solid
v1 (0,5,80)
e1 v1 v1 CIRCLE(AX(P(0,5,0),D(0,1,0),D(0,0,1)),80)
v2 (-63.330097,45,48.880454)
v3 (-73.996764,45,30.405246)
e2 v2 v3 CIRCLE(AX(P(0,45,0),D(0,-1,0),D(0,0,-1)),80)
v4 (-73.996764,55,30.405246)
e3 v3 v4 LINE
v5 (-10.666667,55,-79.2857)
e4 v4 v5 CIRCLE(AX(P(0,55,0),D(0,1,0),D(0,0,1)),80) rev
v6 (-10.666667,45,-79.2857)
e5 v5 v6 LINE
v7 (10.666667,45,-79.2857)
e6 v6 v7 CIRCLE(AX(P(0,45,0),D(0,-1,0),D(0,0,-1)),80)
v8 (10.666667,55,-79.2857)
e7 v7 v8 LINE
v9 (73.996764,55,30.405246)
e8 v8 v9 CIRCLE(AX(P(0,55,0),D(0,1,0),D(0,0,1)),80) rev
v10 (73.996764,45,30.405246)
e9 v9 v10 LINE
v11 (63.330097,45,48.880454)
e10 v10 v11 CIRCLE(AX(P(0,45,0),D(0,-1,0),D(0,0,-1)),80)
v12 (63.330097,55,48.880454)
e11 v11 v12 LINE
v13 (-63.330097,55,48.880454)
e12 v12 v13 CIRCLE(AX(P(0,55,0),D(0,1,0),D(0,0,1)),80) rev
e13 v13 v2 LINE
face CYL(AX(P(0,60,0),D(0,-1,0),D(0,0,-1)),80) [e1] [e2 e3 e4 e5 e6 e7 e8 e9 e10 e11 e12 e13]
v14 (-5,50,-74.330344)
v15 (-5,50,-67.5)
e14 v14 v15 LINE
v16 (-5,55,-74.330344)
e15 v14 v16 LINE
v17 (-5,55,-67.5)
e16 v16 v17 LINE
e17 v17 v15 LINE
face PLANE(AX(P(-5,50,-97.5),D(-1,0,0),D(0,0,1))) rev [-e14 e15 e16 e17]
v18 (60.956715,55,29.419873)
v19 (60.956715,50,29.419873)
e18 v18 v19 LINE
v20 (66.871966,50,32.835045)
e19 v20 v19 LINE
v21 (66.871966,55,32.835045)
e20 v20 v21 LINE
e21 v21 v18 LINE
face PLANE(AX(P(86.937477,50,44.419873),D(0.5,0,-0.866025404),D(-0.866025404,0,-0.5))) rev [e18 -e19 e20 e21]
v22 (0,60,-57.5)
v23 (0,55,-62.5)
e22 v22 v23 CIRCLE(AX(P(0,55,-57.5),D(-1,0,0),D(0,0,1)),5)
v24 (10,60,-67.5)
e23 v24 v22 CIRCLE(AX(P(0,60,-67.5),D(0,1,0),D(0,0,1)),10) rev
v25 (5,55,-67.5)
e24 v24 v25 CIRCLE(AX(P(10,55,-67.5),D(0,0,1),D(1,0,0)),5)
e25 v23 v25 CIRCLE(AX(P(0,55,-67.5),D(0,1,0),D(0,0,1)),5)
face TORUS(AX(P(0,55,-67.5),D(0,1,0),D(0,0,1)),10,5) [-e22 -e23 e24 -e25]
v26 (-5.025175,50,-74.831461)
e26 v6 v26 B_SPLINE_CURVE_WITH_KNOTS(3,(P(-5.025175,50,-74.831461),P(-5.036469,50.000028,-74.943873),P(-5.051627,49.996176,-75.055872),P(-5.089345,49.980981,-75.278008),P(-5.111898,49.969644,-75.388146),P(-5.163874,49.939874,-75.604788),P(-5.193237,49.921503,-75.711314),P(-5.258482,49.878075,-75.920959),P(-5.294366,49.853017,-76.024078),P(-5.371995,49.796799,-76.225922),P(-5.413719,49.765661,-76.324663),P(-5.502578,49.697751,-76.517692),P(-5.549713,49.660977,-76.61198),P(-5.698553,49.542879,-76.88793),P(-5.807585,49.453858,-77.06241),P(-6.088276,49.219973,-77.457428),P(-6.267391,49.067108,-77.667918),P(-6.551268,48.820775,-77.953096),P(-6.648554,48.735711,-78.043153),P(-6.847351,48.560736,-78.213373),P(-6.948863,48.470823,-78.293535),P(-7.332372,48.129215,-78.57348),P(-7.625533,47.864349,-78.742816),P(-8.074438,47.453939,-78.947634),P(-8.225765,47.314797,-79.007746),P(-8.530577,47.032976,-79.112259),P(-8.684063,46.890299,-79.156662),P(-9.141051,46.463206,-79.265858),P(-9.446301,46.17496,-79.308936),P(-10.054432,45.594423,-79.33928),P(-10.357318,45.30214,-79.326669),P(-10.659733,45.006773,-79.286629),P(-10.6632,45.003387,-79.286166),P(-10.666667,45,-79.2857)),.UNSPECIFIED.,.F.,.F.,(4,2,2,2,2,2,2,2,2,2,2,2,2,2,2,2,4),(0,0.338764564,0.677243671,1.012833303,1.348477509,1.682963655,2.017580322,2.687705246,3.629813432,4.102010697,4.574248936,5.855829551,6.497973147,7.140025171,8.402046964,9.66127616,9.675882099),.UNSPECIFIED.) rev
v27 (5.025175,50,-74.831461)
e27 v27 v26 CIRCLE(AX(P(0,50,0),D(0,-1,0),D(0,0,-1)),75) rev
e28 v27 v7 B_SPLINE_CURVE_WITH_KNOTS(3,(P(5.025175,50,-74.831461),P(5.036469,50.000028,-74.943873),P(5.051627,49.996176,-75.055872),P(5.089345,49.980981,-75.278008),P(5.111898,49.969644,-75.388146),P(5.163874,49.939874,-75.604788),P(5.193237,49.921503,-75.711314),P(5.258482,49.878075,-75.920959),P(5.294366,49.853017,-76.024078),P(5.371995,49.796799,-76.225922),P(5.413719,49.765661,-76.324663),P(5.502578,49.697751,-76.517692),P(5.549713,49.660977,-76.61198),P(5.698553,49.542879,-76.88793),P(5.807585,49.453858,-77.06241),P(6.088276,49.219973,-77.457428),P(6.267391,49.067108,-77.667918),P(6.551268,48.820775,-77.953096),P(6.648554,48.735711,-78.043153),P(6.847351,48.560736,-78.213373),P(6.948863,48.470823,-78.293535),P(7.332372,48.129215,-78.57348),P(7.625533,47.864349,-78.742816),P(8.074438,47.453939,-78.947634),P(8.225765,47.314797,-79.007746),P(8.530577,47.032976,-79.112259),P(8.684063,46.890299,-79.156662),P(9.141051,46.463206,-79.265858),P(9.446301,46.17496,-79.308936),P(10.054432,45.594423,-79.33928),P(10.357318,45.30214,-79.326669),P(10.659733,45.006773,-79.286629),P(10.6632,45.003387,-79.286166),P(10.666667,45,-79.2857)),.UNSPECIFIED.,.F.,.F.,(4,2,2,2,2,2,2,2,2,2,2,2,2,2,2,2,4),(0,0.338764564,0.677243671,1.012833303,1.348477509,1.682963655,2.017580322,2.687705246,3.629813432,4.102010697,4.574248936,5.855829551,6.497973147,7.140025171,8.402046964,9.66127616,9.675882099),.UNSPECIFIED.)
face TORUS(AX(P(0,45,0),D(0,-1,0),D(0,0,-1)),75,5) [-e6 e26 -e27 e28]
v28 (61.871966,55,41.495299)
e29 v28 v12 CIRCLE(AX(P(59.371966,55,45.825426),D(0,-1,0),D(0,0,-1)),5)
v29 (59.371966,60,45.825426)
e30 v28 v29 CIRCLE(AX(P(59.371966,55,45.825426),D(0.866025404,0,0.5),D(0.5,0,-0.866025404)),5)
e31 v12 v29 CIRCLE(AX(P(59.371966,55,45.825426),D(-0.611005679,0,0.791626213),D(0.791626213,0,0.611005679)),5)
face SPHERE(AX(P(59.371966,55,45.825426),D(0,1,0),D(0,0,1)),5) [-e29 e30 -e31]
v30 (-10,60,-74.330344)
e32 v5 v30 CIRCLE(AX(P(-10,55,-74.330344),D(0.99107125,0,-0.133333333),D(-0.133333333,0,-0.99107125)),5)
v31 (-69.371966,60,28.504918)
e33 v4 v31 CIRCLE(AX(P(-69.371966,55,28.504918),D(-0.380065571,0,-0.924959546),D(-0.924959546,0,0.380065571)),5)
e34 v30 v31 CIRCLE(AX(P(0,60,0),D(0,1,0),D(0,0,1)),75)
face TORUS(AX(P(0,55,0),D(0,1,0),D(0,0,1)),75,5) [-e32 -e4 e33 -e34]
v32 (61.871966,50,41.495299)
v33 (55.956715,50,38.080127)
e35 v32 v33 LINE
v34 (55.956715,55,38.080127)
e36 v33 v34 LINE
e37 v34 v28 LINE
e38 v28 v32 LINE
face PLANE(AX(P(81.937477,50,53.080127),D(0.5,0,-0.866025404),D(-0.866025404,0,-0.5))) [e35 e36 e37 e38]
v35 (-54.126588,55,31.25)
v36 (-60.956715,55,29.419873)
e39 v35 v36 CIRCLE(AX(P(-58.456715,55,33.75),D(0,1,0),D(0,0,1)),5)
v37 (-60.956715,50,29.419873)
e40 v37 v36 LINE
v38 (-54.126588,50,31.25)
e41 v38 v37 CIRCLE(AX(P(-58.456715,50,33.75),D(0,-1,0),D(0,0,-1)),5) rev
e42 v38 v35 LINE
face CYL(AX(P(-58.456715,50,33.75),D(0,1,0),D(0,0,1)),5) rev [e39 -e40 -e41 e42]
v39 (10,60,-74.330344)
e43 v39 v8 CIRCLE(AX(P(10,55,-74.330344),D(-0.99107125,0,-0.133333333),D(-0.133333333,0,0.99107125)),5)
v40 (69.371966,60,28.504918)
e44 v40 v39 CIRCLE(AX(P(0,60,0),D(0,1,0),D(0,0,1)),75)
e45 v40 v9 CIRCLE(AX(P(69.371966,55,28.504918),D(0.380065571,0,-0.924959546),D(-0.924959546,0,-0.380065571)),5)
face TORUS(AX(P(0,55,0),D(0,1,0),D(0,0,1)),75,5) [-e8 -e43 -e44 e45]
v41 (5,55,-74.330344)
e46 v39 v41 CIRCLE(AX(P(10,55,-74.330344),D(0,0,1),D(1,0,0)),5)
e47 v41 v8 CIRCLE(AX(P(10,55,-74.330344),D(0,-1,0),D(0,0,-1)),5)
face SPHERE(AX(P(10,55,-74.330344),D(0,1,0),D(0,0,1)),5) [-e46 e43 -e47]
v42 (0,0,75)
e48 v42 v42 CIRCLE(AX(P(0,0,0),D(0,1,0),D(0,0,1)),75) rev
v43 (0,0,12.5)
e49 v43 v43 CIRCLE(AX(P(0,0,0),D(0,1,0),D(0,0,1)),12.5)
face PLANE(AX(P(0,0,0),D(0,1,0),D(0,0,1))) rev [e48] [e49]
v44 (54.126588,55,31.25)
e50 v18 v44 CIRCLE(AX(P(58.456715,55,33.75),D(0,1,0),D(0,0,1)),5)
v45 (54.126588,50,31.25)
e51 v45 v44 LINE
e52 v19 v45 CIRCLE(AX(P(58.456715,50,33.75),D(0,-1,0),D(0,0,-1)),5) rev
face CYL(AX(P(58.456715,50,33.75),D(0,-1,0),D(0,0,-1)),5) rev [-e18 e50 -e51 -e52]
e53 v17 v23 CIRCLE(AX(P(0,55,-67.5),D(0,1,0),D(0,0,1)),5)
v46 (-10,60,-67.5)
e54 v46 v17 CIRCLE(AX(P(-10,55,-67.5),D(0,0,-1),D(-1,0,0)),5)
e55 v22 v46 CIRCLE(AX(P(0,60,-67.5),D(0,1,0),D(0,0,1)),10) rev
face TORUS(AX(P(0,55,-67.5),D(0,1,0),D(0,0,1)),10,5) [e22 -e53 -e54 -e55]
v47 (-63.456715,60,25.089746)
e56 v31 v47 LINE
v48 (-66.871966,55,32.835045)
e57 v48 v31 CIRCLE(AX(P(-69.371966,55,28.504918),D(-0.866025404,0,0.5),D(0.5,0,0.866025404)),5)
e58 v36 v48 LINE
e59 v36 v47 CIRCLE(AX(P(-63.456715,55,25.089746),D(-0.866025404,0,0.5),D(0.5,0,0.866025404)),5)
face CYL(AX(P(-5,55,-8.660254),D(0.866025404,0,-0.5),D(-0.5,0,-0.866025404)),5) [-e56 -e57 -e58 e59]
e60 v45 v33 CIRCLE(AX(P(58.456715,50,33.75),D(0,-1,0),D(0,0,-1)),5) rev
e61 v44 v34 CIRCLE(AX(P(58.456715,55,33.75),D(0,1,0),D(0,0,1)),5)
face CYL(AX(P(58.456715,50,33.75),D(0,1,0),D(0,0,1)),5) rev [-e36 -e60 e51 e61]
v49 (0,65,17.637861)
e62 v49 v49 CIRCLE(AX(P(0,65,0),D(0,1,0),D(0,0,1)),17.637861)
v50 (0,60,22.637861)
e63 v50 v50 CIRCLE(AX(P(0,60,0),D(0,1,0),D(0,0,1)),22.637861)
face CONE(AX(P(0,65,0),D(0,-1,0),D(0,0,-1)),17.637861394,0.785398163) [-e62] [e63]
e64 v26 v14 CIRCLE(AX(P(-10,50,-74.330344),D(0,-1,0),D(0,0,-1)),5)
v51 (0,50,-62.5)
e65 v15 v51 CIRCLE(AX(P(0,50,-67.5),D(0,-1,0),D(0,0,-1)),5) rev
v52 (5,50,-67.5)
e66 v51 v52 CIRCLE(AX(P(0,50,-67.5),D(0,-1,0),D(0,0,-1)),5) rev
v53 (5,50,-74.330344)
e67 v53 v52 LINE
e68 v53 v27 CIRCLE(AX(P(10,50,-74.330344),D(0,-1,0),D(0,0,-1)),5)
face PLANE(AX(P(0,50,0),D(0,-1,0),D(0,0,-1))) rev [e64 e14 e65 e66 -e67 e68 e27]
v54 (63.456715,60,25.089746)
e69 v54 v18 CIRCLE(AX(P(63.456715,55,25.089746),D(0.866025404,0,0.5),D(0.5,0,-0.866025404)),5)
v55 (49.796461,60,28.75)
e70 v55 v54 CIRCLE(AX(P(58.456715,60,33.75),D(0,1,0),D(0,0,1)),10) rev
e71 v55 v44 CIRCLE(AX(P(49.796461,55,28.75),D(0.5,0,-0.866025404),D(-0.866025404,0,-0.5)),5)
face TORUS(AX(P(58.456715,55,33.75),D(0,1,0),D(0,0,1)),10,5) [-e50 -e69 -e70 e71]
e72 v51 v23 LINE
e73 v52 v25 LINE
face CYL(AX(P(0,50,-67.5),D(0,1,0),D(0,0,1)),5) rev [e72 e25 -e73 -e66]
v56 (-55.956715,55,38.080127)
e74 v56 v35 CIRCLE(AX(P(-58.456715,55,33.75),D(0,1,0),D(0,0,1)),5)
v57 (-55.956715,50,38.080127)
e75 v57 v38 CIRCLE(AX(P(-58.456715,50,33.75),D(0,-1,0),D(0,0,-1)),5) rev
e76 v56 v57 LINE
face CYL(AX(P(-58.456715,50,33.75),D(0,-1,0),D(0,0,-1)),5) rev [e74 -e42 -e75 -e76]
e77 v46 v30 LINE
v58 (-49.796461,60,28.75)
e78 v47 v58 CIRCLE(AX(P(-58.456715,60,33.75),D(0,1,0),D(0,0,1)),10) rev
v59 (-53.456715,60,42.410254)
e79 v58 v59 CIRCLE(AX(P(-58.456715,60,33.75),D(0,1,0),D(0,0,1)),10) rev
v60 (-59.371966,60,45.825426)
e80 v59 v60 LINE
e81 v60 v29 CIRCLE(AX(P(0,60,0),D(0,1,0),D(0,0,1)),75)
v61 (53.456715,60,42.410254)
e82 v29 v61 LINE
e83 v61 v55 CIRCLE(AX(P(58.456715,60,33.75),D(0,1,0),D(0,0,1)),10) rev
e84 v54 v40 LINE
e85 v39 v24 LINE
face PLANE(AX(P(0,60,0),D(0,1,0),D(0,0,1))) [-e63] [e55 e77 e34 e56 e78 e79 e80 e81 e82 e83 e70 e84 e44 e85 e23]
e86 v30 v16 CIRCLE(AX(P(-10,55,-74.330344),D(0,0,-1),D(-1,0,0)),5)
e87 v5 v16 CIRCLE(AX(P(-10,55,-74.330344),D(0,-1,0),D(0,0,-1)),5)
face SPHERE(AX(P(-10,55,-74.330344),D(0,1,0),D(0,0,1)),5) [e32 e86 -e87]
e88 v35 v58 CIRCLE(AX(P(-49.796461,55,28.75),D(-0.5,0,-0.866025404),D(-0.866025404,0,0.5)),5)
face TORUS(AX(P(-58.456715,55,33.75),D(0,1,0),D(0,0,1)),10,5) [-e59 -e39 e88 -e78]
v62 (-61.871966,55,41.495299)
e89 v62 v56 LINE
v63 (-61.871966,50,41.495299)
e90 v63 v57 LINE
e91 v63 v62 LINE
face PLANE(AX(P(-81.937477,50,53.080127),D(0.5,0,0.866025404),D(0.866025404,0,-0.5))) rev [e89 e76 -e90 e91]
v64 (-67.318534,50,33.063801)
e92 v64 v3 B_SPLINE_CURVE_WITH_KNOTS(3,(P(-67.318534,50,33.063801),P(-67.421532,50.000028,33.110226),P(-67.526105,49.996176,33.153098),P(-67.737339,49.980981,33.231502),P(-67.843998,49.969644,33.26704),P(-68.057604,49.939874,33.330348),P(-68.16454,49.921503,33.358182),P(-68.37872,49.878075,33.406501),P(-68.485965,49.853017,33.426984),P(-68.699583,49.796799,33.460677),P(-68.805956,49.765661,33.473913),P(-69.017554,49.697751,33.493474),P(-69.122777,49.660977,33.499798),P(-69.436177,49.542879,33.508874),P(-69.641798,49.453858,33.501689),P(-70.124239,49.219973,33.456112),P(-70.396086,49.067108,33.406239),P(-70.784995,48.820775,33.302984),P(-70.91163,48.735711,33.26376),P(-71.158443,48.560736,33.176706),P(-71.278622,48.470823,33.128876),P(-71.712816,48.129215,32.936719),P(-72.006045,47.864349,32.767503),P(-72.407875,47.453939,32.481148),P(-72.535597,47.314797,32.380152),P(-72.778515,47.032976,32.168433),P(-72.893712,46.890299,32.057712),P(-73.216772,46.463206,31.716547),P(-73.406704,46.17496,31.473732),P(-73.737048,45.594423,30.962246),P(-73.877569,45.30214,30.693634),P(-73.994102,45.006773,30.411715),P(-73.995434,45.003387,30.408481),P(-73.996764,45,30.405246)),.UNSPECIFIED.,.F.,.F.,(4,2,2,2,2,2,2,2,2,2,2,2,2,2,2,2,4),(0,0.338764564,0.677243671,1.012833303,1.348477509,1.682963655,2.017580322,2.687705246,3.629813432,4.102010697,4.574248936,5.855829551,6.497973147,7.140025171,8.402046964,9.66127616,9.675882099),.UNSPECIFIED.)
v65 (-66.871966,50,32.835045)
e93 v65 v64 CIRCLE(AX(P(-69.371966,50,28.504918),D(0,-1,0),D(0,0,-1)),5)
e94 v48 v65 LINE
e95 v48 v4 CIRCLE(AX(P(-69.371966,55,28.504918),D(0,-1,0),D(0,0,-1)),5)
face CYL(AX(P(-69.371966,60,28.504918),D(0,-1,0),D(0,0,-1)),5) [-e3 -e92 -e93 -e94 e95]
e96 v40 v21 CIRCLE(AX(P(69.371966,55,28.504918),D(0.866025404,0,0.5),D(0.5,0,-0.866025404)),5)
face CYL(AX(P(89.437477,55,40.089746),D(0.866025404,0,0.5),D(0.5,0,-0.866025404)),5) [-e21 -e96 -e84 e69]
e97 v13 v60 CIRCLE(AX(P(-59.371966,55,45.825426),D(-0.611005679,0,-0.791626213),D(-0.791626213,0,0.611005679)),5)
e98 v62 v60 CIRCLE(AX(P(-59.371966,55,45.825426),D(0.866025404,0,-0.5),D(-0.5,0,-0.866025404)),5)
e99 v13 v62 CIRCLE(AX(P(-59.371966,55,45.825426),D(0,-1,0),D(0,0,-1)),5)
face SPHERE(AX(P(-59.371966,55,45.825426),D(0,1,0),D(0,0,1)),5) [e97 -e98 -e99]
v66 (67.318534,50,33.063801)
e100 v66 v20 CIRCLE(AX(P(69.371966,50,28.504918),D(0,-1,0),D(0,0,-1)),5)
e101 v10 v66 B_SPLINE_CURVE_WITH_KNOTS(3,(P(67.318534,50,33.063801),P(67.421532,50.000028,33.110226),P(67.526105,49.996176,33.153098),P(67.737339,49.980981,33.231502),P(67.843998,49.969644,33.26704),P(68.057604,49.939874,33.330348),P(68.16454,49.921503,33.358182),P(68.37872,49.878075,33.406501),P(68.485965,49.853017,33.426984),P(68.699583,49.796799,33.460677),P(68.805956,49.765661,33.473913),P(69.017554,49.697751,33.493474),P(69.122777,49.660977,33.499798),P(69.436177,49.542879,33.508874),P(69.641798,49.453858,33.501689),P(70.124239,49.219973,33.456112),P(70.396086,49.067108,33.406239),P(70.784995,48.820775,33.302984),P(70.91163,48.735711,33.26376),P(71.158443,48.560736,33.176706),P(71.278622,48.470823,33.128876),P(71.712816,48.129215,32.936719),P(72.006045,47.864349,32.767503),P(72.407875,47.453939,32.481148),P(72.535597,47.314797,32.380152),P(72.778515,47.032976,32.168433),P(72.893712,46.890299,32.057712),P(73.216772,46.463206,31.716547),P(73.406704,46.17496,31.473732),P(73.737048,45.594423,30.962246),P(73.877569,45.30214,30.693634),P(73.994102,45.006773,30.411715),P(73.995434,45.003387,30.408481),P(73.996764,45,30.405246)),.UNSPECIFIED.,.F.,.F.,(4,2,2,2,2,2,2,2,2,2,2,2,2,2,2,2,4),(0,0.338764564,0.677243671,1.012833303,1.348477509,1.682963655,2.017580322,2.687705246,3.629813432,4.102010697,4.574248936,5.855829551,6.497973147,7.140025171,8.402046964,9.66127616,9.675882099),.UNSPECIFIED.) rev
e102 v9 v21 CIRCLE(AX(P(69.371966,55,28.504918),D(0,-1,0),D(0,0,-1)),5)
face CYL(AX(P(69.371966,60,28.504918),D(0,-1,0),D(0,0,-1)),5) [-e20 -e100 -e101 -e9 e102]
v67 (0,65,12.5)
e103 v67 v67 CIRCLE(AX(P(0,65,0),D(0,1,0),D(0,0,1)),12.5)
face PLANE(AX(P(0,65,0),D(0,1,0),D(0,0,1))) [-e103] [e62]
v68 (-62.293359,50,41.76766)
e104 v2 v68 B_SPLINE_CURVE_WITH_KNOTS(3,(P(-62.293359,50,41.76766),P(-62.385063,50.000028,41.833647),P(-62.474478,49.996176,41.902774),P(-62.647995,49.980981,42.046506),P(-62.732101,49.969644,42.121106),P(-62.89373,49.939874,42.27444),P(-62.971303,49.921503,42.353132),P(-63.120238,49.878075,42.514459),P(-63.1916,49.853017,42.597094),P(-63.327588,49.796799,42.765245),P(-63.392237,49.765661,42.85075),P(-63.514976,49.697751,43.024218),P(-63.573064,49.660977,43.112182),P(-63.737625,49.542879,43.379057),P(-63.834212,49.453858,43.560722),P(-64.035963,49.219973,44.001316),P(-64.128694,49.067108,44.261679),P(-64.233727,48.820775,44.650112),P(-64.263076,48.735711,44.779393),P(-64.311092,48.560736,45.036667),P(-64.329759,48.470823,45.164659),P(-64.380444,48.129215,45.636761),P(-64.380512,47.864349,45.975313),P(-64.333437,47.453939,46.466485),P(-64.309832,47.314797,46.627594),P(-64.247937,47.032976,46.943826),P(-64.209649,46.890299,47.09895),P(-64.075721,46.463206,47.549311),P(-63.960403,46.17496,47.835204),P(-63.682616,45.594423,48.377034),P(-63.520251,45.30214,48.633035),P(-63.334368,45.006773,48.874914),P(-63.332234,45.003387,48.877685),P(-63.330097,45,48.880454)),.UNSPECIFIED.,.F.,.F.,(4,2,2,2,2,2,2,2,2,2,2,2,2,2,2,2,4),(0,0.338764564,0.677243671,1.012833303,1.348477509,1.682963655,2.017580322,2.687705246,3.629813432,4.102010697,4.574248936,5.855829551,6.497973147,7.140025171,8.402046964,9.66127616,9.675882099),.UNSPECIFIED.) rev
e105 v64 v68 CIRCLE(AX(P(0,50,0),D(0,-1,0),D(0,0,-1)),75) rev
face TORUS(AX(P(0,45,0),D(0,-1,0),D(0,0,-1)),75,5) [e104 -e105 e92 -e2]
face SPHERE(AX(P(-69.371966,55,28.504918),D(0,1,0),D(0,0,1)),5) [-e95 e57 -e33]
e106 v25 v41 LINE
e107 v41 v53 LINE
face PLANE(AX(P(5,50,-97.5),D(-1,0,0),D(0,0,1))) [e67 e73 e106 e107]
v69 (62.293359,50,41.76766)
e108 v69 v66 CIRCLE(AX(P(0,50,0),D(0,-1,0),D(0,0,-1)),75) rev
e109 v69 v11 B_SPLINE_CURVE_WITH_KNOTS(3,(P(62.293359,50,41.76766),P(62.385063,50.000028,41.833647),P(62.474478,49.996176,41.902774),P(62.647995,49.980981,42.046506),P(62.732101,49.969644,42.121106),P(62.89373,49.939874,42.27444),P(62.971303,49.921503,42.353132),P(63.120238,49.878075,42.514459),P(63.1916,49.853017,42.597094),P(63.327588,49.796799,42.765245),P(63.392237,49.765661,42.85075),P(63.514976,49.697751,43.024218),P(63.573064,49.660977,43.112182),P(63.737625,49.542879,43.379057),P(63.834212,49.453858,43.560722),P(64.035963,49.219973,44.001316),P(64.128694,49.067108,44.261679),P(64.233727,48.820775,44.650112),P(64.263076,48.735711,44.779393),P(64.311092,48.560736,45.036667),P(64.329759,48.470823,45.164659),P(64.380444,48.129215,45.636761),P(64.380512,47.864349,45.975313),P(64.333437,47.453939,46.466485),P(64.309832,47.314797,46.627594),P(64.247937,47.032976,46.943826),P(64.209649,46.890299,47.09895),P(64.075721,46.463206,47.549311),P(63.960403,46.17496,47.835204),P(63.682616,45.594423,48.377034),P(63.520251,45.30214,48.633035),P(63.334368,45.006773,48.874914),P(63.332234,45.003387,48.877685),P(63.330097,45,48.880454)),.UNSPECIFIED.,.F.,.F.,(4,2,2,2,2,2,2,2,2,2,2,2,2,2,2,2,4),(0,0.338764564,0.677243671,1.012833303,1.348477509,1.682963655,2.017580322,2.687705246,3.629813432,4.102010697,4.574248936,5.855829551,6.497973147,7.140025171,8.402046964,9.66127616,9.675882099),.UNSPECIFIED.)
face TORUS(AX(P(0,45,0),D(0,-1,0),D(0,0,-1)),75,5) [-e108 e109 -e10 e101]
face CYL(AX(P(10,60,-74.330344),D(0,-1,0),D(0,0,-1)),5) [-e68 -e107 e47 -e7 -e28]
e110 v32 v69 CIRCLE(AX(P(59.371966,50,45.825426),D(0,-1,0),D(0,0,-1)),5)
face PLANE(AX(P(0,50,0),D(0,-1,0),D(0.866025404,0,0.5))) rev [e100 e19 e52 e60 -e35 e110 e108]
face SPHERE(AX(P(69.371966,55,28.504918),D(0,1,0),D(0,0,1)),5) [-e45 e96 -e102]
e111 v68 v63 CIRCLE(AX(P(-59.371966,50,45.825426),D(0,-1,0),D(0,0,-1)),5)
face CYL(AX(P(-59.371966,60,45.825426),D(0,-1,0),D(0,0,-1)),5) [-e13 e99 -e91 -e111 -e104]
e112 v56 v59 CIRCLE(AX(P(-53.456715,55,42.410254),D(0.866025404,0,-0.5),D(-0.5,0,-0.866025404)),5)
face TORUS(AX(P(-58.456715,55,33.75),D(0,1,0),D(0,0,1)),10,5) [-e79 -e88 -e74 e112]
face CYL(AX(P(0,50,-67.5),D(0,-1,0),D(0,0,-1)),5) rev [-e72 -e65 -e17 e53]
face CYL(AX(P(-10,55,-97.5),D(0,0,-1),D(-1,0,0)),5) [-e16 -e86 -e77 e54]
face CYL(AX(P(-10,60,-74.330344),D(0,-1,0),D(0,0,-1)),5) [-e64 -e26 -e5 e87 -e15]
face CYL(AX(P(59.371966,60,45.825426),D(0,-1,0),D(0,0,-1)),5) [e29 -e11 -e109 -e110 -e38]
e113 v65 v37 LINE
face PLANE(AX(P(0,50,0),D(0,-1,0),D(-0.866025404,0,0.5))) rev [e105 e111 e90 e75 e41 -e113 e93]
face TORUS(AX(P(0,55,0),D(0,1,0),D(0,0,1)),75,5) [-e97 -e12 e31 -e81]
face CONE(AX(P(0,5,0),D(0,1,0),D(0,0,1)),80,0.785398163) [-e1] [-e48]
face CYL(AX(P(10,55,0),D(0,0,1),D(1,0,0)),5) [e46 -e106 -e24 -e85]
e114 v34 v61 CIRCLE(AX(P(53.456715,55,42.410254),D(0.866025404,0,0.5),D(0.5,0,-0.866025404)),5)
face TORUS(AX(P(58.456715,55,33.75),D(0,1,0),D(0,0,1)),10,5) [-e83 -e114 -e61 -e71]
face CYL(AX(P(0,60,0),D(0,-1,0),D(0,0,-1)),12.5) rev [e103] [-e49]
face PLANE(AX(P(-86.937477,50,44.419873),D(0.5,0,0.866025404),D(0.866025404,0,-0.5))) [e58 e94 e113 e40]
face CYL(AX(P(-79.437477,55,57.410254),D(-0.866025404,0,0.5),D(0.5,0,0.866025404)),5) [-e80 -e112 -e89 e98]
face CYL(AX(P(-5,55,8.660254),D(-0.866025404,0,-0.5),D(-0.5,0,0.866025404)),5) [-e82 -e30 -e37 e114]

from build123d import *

# Parameters (mm, degrees)
SKETCH_1_R                       = 80
SKETCH_1_R_2                     = 12.5
EXTRUDE_1_DEPTH                  = 60
SKETCH_2_R                       = 22.637861394
SKETCH_2_R_2                     = 12.5
EXTRUDE_2_DEPTH                  = 5
CHAMFER_1_SIZE                   = 5
CHAMFER_2_SIZE                   = 5
SKETCH_3_W                       = 10
SKETCH_3_H                       = 35
CUT_EXTRUDE_1_DEPTH              = 10
FILLET_1_R                       = 5
PATTERN_CIRCULAR_1_COUNT         = 3
FILLET_1_OF_PATTERN_CIRCULAR_1_R = 5
FILLET_2_R                       = 5


# Some blends are built 0.0001 mm under size
with BuildPart() as part:
    # 草图1 → 凸台-拉伸1 (new body)
    with BuildSketch(Plane(origin=(0, 0, 0), x_dir=(1, 0, 0), z_dir=(0, 1, 0))):
        with Locations(Location((0, 0, 0), (0, 0, 270))):
            Circle(SKETCH_1_R)
        with Locations(Location((0, 0, 0), (0, 0, 270))):
            Circle(SKETCH_1_R_2, mode=Mode.SUBTRACT)
    extrude(amount=EXTRUDE_1_DEPTH)

    # 草图2 → 凸台-拉伸2 (add)
    with BuildSketch(Plane(origin=(0, 60, 0), x_dir=(1, 0, 0), z_dir=(0, 1, 0))):
        with Locations(Location((0, 0, 0), (0, 0, 270))):
            Circle(SKETCH_2_R)
        with Locations(Location((0, 0, 0), (0, 0, 270))):
            Circle(SKETCH_2_R_2, mode=Mode.SUBTRACT)
    extrude(amount=EXTRUDE_2_DEPTH)

    # 倒角1
    chamfer_1_edges = [part.edges().sort_by_distance(p)[0] for p in [
        (0, 65, -22.637861394),
    ]]
    chamfer(chamfer_1_edges, length=CHAMFER_1_SIZE - 0.0001)  # a hair under: the kernel refuses the full size

    # 倒角2
    chamfer_2_edges = [part.edges().sort_by_distance(p)[0] for p in [
        (0, 0, -80),
    ]]
    chamfer(chamfer_2_edges, length=CHAMFER_2_SIZE)

    # 草图3 → 切除-拉伸1 (cut)
    with BuildSketch(Plane(origin=(0, 60, 0), x_dir=(1, 0, 0), z_dir=(0, 1, 0))):
        with Locations((0, 80)):
            Rectangle(SKETCH_3_W, SKETCH_3_H)
    cut_extrude_1 = extrude(amount=-CUT_EXTRUDE_1_DEPTH, mode=Mode.SUBTRACT)

    # 圆角1
    # the kernel refuses this fillet: 5 mm, written as the material it adds along each edge
    with BuildSketch(Plane(origin=(5, 60, -62.5), x_dir=(0, 0, -1), z_dir=(0, -1, 0))) as fillet_1_piece_1:
        with BuildLine():
            CenterArc((FILLET_1_R, -FILLET_1_R), FILLET_1_R, 90, 90)
            Line((0, -FILLET_1_R), (0, 0))
            Line((0, 0), (FILLET_1_R, 0))
        make_face()
    extrude(amount=22.5)
    with BuildSketch(Plane(origin=(-5, 60, -62.5), x_dir=(0, 0, -1), z_dir=(0, -1, 0))) as fillet_1_piece_2:
        with BuildLine():
            CenterArc((FILLET_1_R, FILLET_1_R), FILLET_1_R, 180, 90)
            Line((0, FILLET_1_R), (0, 0))
            Line((0, 0), (FILLET_1_R, 0))
        make_face()
    extrude(amount=22.5)
    # the kernel refuses this fillet: 5 mm, written as the material it takes off along each edge
    with BuildSketch(Plane(origin=(0, 50, 0), x_dir=(-0.21704975973433055, 0, -0.9761605409968533), z_dir=(-0.9761605409968533, 0, 0.21704975973433055))) as fillet_1_2_piece_1_section:
        with BuildLine():
            CenterArc((80 - FILLET_1_R, FILLET_1_R), FILLET_1_R, 270, 90)
            Line((80 - FILLET_1_R, 0), (80, 0))
            Line((80, 0), (80, FILLET_1_R))
        make_face()
    fillet_1_2_piece_1 = revolve(axis=Axis((0, 50, 0), (0, -1, 0)), revolution_arc=25.071620089, mode=Mode.PRIVATE)
    fillet_1_2_piece_1 = split(fillet_1_2_piece_1, bisect_by=Plane(origin=(5, 48.868036462, -78.815102538), z_dir=(-1, 0, 0)), keep=Keep.TOP, mode=Mode.PRIVATE)
    fillet_1_2_piece_1 = split(fillet_1_2_piece_1, bisect_by=Plane(origin=(-5, 48.868036462, -78.815102538), z_dir=(1, 0, 0)), keep=Keep.TOP, mode=Mode.PRIVATE)
    add(fillet_1_2_piece_1, mode=Mode.SUBTRACT)
    with BuildSketch(Plane(origin=(5, 74.235159008, -79.843597113), x_dir=(0.995188508885034, 0, 0.09797873127971658), z_dir=(0, -1, 0))) as fillet_1_2_piece_2:
        with BuildLine():
            CenterArc((5.516124116, 4.996832751), FILLET_1_R, 174.37721132, 97.662255661)
            Line((0.540181571, 5.486726407), (0, 0))
            ThreePointArc((0, 0), (2.847031802, -0.050675988), (5.694063603, 0))
        make_face()
    extrude(amount=24.235159008, mode=Mode.SUBTRACT)
    with BuildSketch(Plane(origin=(-5, 74.235159008, -79.843597113), x_dir=(-0.9951885088850337, 0, 0.09797873127971717), z_dir=(0, -1, 0))) as fillet_1_2_piece_3:
        with BuildLine():
            CenterArc((5.516124116, -4.996832751), FILLET_1_R, 87.960533019, 97.662255661)
            Line((0.540181571, -5.486726407), (0, 0))
            ThreePointArc((0, 0), (2.847031802, 0.050675988), (5.694063603, 0))
        make_face()
    extrude(amount=24.235159008, mode=Mode.SUBTRACT)
    with BuildSketch(Plane(origin=(-5, 74.235159008, -79.843597113), x_dir=(-0.9951885088850337, 0, 0.09797873127971717), z_dir=(0, -1, 0))) as fillet_1_2_piece_4a_section:
        with BuildLine():
            CenterArc((5.516124116, -4.996832751), FILLET_1_R, 87.960533019, 97.662255661)
            Line((0.540181571, -5.486726407), (0, 0))
            ThreePointArc((0, 0), (2.847031802, 0.050675988), (5.694063603, 0))
        make_face()
    fillet_1_2_piece_4a = extrude(amount=38.470318016, mode=Mode.PRIVATE)
    fillet_1_2_piece_4a = split(fillet_1_2_piece_4a, bisect_by=Plane(origin=(-6.303094147, 50, -78.486698353), z_dir=(0, -1, 0)), keep=Keep.TOP, mode=Mode.PRIVATE)
    with BuildSketch(Plane(origin=(0, 50, 0), x_dir=(-0.21704975973433055, 0, -0.9761605409968533), z_dir=(-0.9761605409968533, 0, 0.21704975973433055))) as fillet_1_2_piece_4b_section:
        with BuildLine():
            CenterArc((80 - FILLET_1_R, FILLET_1_R), FILLET_1_R, 270, 90)
            Line((80 - FILLET_1_R, 0), (80, 0))
            Line((80, 0), (80, FILLET_1_R))
        make_face()
    fillet_1_2_piece_4b = revolve(axis=Axis((0, 50, 0), (0, -1, 0)), revolution_arc=25.071620089, mode=Mode.PRIVATE)
    fillet_1_2_piece_4b = split(fillet_1_2_piece_4b, bisect_by=Plane(origin=(-5, 48.855762225, -78.026154308), z_dir=(-1, 0, 0)), keep=Keep.TOP, mode=Mode.PRIVATE)
    fillet_1_2_piece_4 = fillet_1_2_piece_4a & fillet_1_2_piece_4b
    add(fillet_1_2_piece_4, mode=Mode.SUBTRACT)
    with BuildSketch(Plane(origin=(0, 50, 0), x_dir=(-0.21704975973433055, 0, -0.9761605409968533), z_dir=(-0.9761605409968533, 0, 0.21704975973433055))) as fillet_1_2_piece_5a_section:
        with BuildLine():
            CenterArc((80 - FILLET_1_R, FILLET_1_R), FILLET_1_R, 270, 90)
            Line((80 - FILLET_1_R, 0), (80, 0))
            Line((80, 0), (80, FILLET_1_R))
        make_face()
    fillet_1_2_piece_5a = revolve(axis=Axis((0, 50, 0), (0, -1, 0)), revolution_arc=25.071620089, mode=Mode.PRIVATE)
    fillet_1_2_piece_5a = split(fillet_1_2_piece_5a, bisect_by=Plane(origin=(5, 48.855762126, -78.026154496), z_dir=(1, 0, 0)), keep=Keep.TOP, mode=Mode.PRIVATE)
    with BuildSketch(Plane(origin=(5, 74.235159008, -79.843597113), x_dir=(0.995188508885034, 0, 0.09797873127971658), z_dir=(0, -1, 0))) as fillet_1_2_piece_5b_section:
        with BuildLine():
            CenterArc((5.516124116, 4.996832751), FILLET_1_R, 174.37721132, 97.662255661)
            Line((0.540181571, 5.486726407), (0, 0))
            ThreePointArc((0, 0), (2.847031802, -0.050675988), (5.694063603, 0))
        make_face()
    fillet_1_2_piece_5b = extrude(amount=38.470318016, mode=Mode.PRIVATE)
    fillet_1_2_piece_5b = split(fillet_1_2_piece_5b, bisect_by=Plane(origin=(6.303094147, 50, -78.486698353), z_dir=(0, -1, 0)), keep=Keep.TOP, mode=Mode.PRIVATE)
    fillet_1_2_piece_5 = fillet_1_2_piece_5a & fillet_1_2_piece_5b
    add(fillet_1_2_piece_5, mode=Mode.SUBTRACT)

    # 阵列(圆周)1: 切除-拉伸1 ×3 about axis
    pattern_circular_1_axis = Axis((0, 0, 0), (0, 1, 0))
    for i in range(1, PATTERN_CIRCULAR_1_COUNT):
        add(cut_extrude_1.rotate(pattern_circular_1_axis, i * 360 / PATTERN_CIRCULAR_1_COUNT), mode=Mode.SUBTRACT)

    # 圆角1 of 阵列(圆周)1
    # the kernel refuses this fillet: 5 mm, written as the material it adds along each edge
    with BuildSketch(Plane(origin=(-56.626587737, 60, 26.919872981), x_dir=(0.4999999999999999, 0, 0.8660254037844387), z_dir=(0, -1, 0)), Plane(origin=(-51.626587737, 60, 35.580127019), x_dir=(-0.8660254037844385, 0, 0.5000000000000002), z_dir=(0, -1, 0)), Plane(origin=(51.626587737, 60, 35.580127019), x_dir=(0.5000000000000002, 0, -0.8660254037844385), z_dir=(0, -1, 0)), Plane(origin=(56.626587737, 60, 26.919872981), x_dir=(0.8660254037844382, 0, 0.5000000000000007), z_dir=(0, -1, 0))) as fillet_1_of_pattern_circular_1_piece_1:
        with BuildLine():
            CenterArc((FILLET_1_OF_PATTERN_CIRCULAR_1_R, FILLET_1_OF_PATTERN_CIRCULAR_1_R), FILLET_1_OF_PATTERN_CIRCULAR_1_R, 180, 90)
            Line((0, FILLET_1_OF_PATTERN_CIRCULAR_1_R), (0, 0))
            Line((0, 0), (FILLET_1_OF_PATTERN_CIRCULAR_1_R, 0))
        make_face()
    extrude(amount=22.5)
    # the kernel refuses this fillet: 5 mm, written as the material it takes off along each edge
    with BuildSketch(Plane(origin=(0, 50, 0), x_dir=(-0.7368549468080707, 0, 0.6760508763136656), z_dir=(0.6760508763136656, 0, 0.7368549468080707))) as fillet_1_of_pattern_circular_1_2_piece_1_section:
        with BuildLine():
            CenterArc((80 - FILLET_1_OF_PATTERN_CIRCULAR_1_R, FILLET_1_OF_PATTERN_CIRCULAR_1_R), FILLET_1_OF_PATTERN_CIRCULAR_1_R, 270, 90)
            Line((80 - FILLET_1_OF_PATTERN_CIRCULAR_1_R, 0), (80, 0))
            Line((80, 0), (80, FILLET_1_OF_PATTERN_CIRCULAR_1_R))
        make_face()
    fillet_1_of_pattern_circular_1_2_piece_1 = revolve(axis=Axis((0, 50, 0), (0, -1, 0)), revolution_arc=25.071620089, mode=Mode.PRIVATE)
    fillet_1_of_pattern_circular_1_2_piece_1 = split(fillet_1_of_pattern_circular_1_2_piece_1, bisect_by=Plane(origin=(-70.755881, 48.868036462, 35.07742425), z_dir=(0.49999999999999994, 0, 0.8660254037844389)), keep=Keep.TOP, mode=Mode.PRIVATE)
    fillet_1_of_pattern_circular_1_2_piece_1 = split(fillet_1_of_pattern_circular_1_2_piece_1, bisect_by=Plane(origin=(-65.755881, 48.868036462, 43.737678288), z_dir=(-0.49999999999999994, 0, -0.8660254037844387)), keep=Keep.TOP, mode=Mode.PRIVATE)
    add(fillet_1_of_pattern_circular_1_2_piece_1, mode=Mode.SUBTRACT)
    with BuildSketch(Plane(origin=(-71.64658343, 74.235159008, 35.591671538), x_dir=(-0.4127421841237098, 0, -0.9108478958886547), z_dir=(0, -1, 0)), Plane(origin=(66.64658343, 74.235159008, 44.251925576), x_dir=(-0.5824463247613232, 0, 0.8128691646089347), z_dir=(0, -1, 0))) as fillet_1_of_pattern_circular_1_2_piece_2:
        with BuildLine():
            CenterArc((5.516124116, 4.996832751), FILLET_1_OF_PATTERN_CIRCULAR_1_R, 174.37721132, 97.662255661)
            Line((0.540181571, 5.486726407), (0, 0))
            ThreePointArc((0, 0), (2.847031802, -0.050675988), (5.694063603, 0))
        make_face()
    extrude(amount=24.235159008, mode=Mode.SUBTRACT)
    with BuildSketch(Plane(origin=(-66.64658343, 74.235159008, 44.251925576), x_dir=(0.582446324761323, 0, 0.8128691646089348), z_dir=(0, -1, 0)), Plane(origin=(71.64658343, 74.235159008, 35.591671538), x_dir=(0.41274218412371083, 0, -0.9108478958886541), z_dir=(0, -1, 0))) as fillet_1_of_pattern_circular_1_2_piece_3:
        with BuildLine():
            CenterArc((5.516124116, -4.996832751), FILLET_1_OF_PATTERN_CIRCULAR_1_R, 87.960533019, 97.662255661)
            Line((0.540181571, -5.486726407), (0, 0))
            ThreePointArc((0, 0), (2.847031802, 0.050675988), (5.694063603, 0))
        make_face()
    extrude(amount=24.235159008, mode=Mode.SUBTRACT)
    with BuildSketch(Plane(origin=(0, 50, 0), x_dir=(0.9539047065424011, 0, 0.3001096646831883), z_dir=(0.3001096646831883, 0, -0.9539047065424011))) as fillet_1_of_pattern_circular_1_2_piece_4_section:
        with BuildLine():
            CenterArc((80 - FILLET_1_OF_PATTERN_CIRCULAR_1_R, FILLET_1_OF_PATTERN_CIRCULAR_1_R), FILLET_1_OF_PATTERN_CIRCULAR_1_R, 270, 90)
            Line((80 - FILLET_1_OF_PATTERN_CIRCULAR_1_R, 0), (80, 0))
            Line((80, 0), (80, FILLET_1_OF_PATTERN_CIRCULAR_1_R))
        make_face()
    fillet_1_of_pattern_circular_1_2_piece_4 = revolve(axis=Axis((0, 50, 0), (0, -1, 0)), revolution_arc=25.071620089, mode=Mode.PRIVATE)
    fillet_1_of_pattern_circular_1_2_piece_4 = split(fillet_1_of_pattern_circular_1_2_piece_4, bisect_by=Plane(origin=(65.755881, 48.868036462, 43.737678288), z_dir=(0.5000000000000004, 0, -0.8660254037844385)), keep=Keep.TOP, mode=Mode.PRIVATE)
    fillet_1_of_pattern_circular_1_2_piece_4 = split(fillet_1_of_pattern_circular_1_2_piece_4, bisect_by=Plane(origin=(70.755881, 48.868036462, 35.07742425), z_dir=(-0.5000000000000003, 0, 0.8660254037844385)), keep=Keep.TOP, mode=Mode.PRIVATE)
    add(fillet_1_of_pattern_circular_1_2_piece_4, mode=Mode.SUBTRACT)
    with BuildSketch(Plane(origin=(-66.64658343, 74.235159008, 44.251925576), x_dir=(0.582446324761323, 0, 0.8128691646089348), z_dir=(0, -1, 0))) as fillet_1_of_pattern_circular_1_2_piece_5a_section:
        with BuildLine():
            CenterArc((5.516124116, -4.996832751), FILLET_1_OF_PATTERN_CIRCULAR_1_R, 87.960533019, 97.662255661)
            Line((0.540181571, -5.486726407), (0, 0))
            ThreePointArc((0, 0), (2.847031802, 0.050675988), (5.694063603, 0))
        make_face()
    fillet_1_of_pattern_circular_1_2_piece_5a = extrude(amount=38.470318016, mode=Mode.PRIVATE)
    fillet_1_of_pattern_circular_1_2_piece_5a = split(fillet_1_of_pattern_circular_1_2_piece_5a, bisect_by=Plane(origin=(-64.81992756, 50, 44.70198883), z_dir=(0, -1, 0)), keep=Keep.TOP, mode=Mode.PRIVATE)
    with BuildSketch(Plane(origin=(0, 50, 0), x_dir=(-0.7368549468080707, 0, 0.6760508763136656), z_dir=(0.6760508763136656, 0, 0.7368549468080707))) as fillet_1_of_pattern_circular_1_2_piece_5b_section:
        with BuildLine():
            CenterArc((80 - FILLET_1_OF_PATTERN_CIRCULAR_1_R, FILLET_1_OF_PATTERN_CIRCULAR_1_R), FILLET_1_OF_PATTERN_CIRCULAR_1_R, 270, 90)
            Line((80 - FILLET_1_OF_PATTERN_CIRCULAR_1_R, 0), (80, 0))
            Line((80, 0), (80, FILLET_1_OF_PATTERN_CIRCULAR_1_R))
        make_face()
    fillet_1_of_pattern_circular_1_2_piece_5b = revolve(axis=Axis((0, 50, 0), (0, -1, 0)), revolution_arc=25.071620089, mode=Mode.PRIVATE)
    fillet_1_of_pattern_circular_1_2_piece_5b = split(fillet_1_of_pattern_circular_1_2_piece_5b, bisect_by=Plane(origin=(-65.072631791, 48.855762225, 43.343204173), z_dir=(0.49999999999999994, 0, 0.8660254037844387)), keep=Keep.TOP, mode=Mode.PRIVATE)
    fillet_1_of_pattern_circular_1_2_piece_5 = fillet_1_of_pattern_circular_1_2_piece_5a & fillet_1_of_pattern_circular_1_2_piece_5b
    add(fillet_1_of_pattern_circular_1_2_piece_5, mode=Mode.SUBTRACT)
    with BuildSketch(Plane(origin=(0, 50, 0), x_dir=(-0.7368549468080707, 0, 0.6760508763136656), z_dir=(0.6760508763136656, 0, 0.7368549468080707))) as fillet_1_of_pattern_circular_1_2_piece_6a_section:
        with BuildLine():
            CenterArc((80 - FILLET_1_OF_PATTERN_CIRCULAR_1_R, FILLET_1_OF_PATTERN_CIRCULAR_1_R), FILLET_1_OF_PATTERN_CIRCULAR_1_R, 270, 90)
            Line((80 - FILLET_1_OF_PATTERN_CIRCULAR_1_R, 0), (80, 0))
            Line((80, 0), (80, FILLET_1_OF_PATTERN_CIRCULAR_1_R))
        make_face()
    fillet_1_of_pattern_circular_1_2_piece_6a = revolve(axis=Axis((0, 50, 0), (0, -1, 0)), revolution_arc=25.071620089, mode=Mode.PRIVATE)
    fillet_1_of_pattern_circular_1_2_piece_6a = split(fillet_1_of_pattern_circular_1_2_piece_6a, bisect_by=Plane(origin=(-70.072631954, 48.855762126, 34.682950229), z_dir=(-0.49999999999999994, 0, -0.8660254037844389)), keep=Keep.TOP, mode=Mode.PRIVATE)
    with BuildSketch(Plane(origin=(-71.64658343, 74.235159008, 35.591671538), x_dir=(-0.4127421841237098, 0, -0.9108478958886547), z_dir=(0, -1, 0))) as fillet_1_of_pattern_circular_1_2_piece_6b_section:
        with BuildLine():
            CenterArc((5.516124116, 4.996832751), FILLET_1_OF_PATTERN_CIRCULAR_1_R, 174.37721132, 97.662255661)
            Line((0.540181571, 5.486726407), (0, 0))
            ThreePointArc((0, 0), (2.847031802, -0.050675988), (5.694063603, 0))
        make_face()
    fillet_1_of_pattern_circular_1_2_piece_6b = extrude(amount=38.470318016, mode=Mode.PRIVATE)
    fillet_1_of_pattern_circular_1_2_piece_6b = split(fillet_1_of_pattern_circular_1_2_piece_6b, bisect_by=Plane(origin=(-71.123021706, 50, 33.784709523), z_dir=(0, -1, 0)), keep=Keep.TOP, mode=Mode.PRIVATE)
    fillet_1_of_pattern_circular_1_2_piece_6 = fillet_1_of_pattern_circular_1_2_piece_6a & fillet_1_of_pattern_circular_1_2_piece_6b
    add(fillet_1_of_pattern_circular_1_2_piece_6, mode=Mode.SUBTRACT)
    with BuildSketch(Plane(origin=(71.64658343, 74.235159008, 35.591671538), x_dir=(0.41274218412371083, 0, -0.9108478958886541), z_dir=(0, -1, 0))) as fillet_1_of_pattern_circular_1_2_piece_7a_section:
        with BuildLine():
            CenterArc((5.516124116, -4.996832751), FILLET_1_OF_PATTERN_CIRCULAR_1_R, 87.960533019, 97.662255661)
            Line((0.540181571, -5.486726407), (0, 0))
            ThreePointArc((0, 0), (2.847031802, 0.050675988), (5.694063603, 0))
        make_face()
    fillet_1_of_pattern_circular_1_2_piece_7a = extrude(amount=38.470318016, mode=Mode.PRIVATE)
    fillet_1_of_pattern_circular_1_2_piece_7a = split(fillet_1_of_pattern_circular_1_2_piece_7a, bisect_by=Plane(origin=(71.123021706, 50, 33.784709523), z_dir=(0, -1, 0)), keep=Keep.TOP, mode=Mode.PRIVATE)
    with BuildSketch(Plane(origin=(0, 50, 0), x_dir=(0.9539047065424011, 0, 0.3001096646831883), z_dir=(0.3001096646831883, 0, -0.9539047065424011))) as fillet_1_of_pattern_circular_1_2_piece_7b_section:
        with BuildLine():
            CenterArc((80 - FILLET_1_OF_PATTERN_CIRCULAR_1_R, FILLET_1_OF_PATTERN_CIRCULAR_1_R), FILLET_1_OF_PATTERN_CIRCULAR_1_R, 270, 90)
            Line((80 - FILLET_1_OF_PATTERN_CIRCULAR_1_R, 0), (80, 0))
            Line((80, 0), (80, FILLET_1_OF_PATTERN_CIRCULAR_1_R))
        make_face()
    fillet_1_of_pattern_circular_1_2_piece_7b = revolve(axis=Axis((0, 50, 0), (0, -1, 0)), revolution_arc=25.071620089, mode=Mode.PRIVATE)
    fillet_1_of_pattern_circular_1_2_piece_7b = split(fillet_1_of_pattern_circular_1_2_piece_7b, bisect_by=Plane(origin=(70.072631791, 48.855762225, 34.682950135), z_dir=(0.5000000000000003, 0, -0.8660254037844385)), keep=Keep.TOP, mode=Mode.PRIVATE)
    fillet_1_of_pattern_circular_1_2_piece_7 = fillet_1_of_pattern_circular_1_2_piece_7a & fillet_1_of_pattern_circular_1_2_piece_7b
    add(fillet_1_of_pattern_circular_1_2_piece_7, mode=Mode.SUBTRACT)
    with BuildSketch(Plane(origin=(0, 50, 0), x_dir=(0.9539047065424011, 0, 0.3001096646831883), z_dir=(0.3001096646831883, 0, -0.9539047065424011))) as fillet_1_of_pattern_circular_1_2_piece_8a_section:
        with BuildLine():
            CenterArc((80 - FILLET_1_OF_PATTERN_CIRCULAR_1_R, FILLET_1_OF_PATTERN_CIRCULAR_1_R), FILLET_1_OF_PATTERN_CIRCULAR_1_R, 270, 90)
            Line((80 - FILLET_1_OF_PATTERN_CIRCULAR_1_R, 0), (80, 0))
            Line((80, 0), (80, FILLET_1_OF_PATTERN_CIRCULAR_1_R))
        make_face()
    fillet_1_of_pattern_circular_1_2_piece_8a = revolve(axis=Axis((0, 50, 0), (0, -1, 0)), revolution_arc=25.071620089, mode=Mode.PRIVATE)
    fillet_1_of_pattern_circular_1_2_piece_8a = split(fillet_1_of_pattern_circular_1_2_piece_8a, bisect_by=Plane(origin=(65.072631954, 48.855762126, 43.343204267), z_dir=(-0.5000000000000004, 0, 0.8660254037844385)), keep=Keep.TOP, mode=Mode.PRIVATE)
    with BuildSketch(Plane(origin=(66.64658343, 74.235159008, 44.251925576), x_dir=(-0.5824463247613232, 0, 0.8128691646089347), z_dir=(0, -1, 0))) as fillet_1_of_pattern_circular_1_2_piece_8b_section:
        with BuildLine():
            CenterArc((5.516124116, 4.996832751), FILLET_1_OF_PATTERN_CIRCULAR_1_R, 174.37721132, 97.662255661)
            Line((0.540181571, 5.486726407), (0, 0))
            ThreePointArc((0, 0), (2.847031802, -0.050675988), (5.694063603, 0))
        make_face()
    fillet_1_of_pattern_circular_1_2_piece_8b = extrude(amount=38.470318016, mode=Mode.PRIVATE)
    fillet_1_of_pattern_circular_1_2_piece_8b = split(fillet_1_of_pattern_circular_1_2_piece_8b, bisect_by=Plane(origin=(64.81992756, 50, 44.70198883), z_dir=(0, -1, 0)), keep=Keep.TOP, mode=Mode.PRIVATE)
    fillet_1_of_pattern_circular_1_2_piece_8 = fillet_1_of_pattern_circular_1_2_piece_8a & fillet_1_of_pattern_circular_1_2_piece_8b
    add(fillet_1_of_pattern_circular_1_2_piece_8, mode=Mode.SUBTRACT)

    # 圆角2
    fillet_2_edges = [part.edges().sort_by_distance(p)[0] for p in [
        (-63.914340352, 60, 31.127458915),
        (-58.914340352, 60, 39.787712953),
        (-64.277268622, 60, 44.856918975),
        (-70.985865679, 60, 33.237288025),
        (-54.126587737, 60, 31.25),
        (-54.126587737, 60, 31.25),
        (69.282032303, 60, -40),
        (58.914340352, 60, 39.787712953),
        (63.914340352, 60, 31.127458915),
        (70.985865679, 60, 33.237288025),
        (64.277268622, 60, 44.856918975),
        (54.126587737, 60, 31.25),
        (54.126587737, 60, 31.25),
        (-69.282032303, 60, -40),
        (5, 60, -70.915171868),
        (-5, 60, -70.915171868),
        (-6.708597057, 60, -78.094207),
        (6.708597057, 60, -78.094207),
        (0, 60, -62.5),
        (0, 60, -62.5),
        (35.281465786, 60, 71.799847994),
    ]]
    fillet(fillet_2_edges, radius=FILLET_2_R)


solid = part.part
